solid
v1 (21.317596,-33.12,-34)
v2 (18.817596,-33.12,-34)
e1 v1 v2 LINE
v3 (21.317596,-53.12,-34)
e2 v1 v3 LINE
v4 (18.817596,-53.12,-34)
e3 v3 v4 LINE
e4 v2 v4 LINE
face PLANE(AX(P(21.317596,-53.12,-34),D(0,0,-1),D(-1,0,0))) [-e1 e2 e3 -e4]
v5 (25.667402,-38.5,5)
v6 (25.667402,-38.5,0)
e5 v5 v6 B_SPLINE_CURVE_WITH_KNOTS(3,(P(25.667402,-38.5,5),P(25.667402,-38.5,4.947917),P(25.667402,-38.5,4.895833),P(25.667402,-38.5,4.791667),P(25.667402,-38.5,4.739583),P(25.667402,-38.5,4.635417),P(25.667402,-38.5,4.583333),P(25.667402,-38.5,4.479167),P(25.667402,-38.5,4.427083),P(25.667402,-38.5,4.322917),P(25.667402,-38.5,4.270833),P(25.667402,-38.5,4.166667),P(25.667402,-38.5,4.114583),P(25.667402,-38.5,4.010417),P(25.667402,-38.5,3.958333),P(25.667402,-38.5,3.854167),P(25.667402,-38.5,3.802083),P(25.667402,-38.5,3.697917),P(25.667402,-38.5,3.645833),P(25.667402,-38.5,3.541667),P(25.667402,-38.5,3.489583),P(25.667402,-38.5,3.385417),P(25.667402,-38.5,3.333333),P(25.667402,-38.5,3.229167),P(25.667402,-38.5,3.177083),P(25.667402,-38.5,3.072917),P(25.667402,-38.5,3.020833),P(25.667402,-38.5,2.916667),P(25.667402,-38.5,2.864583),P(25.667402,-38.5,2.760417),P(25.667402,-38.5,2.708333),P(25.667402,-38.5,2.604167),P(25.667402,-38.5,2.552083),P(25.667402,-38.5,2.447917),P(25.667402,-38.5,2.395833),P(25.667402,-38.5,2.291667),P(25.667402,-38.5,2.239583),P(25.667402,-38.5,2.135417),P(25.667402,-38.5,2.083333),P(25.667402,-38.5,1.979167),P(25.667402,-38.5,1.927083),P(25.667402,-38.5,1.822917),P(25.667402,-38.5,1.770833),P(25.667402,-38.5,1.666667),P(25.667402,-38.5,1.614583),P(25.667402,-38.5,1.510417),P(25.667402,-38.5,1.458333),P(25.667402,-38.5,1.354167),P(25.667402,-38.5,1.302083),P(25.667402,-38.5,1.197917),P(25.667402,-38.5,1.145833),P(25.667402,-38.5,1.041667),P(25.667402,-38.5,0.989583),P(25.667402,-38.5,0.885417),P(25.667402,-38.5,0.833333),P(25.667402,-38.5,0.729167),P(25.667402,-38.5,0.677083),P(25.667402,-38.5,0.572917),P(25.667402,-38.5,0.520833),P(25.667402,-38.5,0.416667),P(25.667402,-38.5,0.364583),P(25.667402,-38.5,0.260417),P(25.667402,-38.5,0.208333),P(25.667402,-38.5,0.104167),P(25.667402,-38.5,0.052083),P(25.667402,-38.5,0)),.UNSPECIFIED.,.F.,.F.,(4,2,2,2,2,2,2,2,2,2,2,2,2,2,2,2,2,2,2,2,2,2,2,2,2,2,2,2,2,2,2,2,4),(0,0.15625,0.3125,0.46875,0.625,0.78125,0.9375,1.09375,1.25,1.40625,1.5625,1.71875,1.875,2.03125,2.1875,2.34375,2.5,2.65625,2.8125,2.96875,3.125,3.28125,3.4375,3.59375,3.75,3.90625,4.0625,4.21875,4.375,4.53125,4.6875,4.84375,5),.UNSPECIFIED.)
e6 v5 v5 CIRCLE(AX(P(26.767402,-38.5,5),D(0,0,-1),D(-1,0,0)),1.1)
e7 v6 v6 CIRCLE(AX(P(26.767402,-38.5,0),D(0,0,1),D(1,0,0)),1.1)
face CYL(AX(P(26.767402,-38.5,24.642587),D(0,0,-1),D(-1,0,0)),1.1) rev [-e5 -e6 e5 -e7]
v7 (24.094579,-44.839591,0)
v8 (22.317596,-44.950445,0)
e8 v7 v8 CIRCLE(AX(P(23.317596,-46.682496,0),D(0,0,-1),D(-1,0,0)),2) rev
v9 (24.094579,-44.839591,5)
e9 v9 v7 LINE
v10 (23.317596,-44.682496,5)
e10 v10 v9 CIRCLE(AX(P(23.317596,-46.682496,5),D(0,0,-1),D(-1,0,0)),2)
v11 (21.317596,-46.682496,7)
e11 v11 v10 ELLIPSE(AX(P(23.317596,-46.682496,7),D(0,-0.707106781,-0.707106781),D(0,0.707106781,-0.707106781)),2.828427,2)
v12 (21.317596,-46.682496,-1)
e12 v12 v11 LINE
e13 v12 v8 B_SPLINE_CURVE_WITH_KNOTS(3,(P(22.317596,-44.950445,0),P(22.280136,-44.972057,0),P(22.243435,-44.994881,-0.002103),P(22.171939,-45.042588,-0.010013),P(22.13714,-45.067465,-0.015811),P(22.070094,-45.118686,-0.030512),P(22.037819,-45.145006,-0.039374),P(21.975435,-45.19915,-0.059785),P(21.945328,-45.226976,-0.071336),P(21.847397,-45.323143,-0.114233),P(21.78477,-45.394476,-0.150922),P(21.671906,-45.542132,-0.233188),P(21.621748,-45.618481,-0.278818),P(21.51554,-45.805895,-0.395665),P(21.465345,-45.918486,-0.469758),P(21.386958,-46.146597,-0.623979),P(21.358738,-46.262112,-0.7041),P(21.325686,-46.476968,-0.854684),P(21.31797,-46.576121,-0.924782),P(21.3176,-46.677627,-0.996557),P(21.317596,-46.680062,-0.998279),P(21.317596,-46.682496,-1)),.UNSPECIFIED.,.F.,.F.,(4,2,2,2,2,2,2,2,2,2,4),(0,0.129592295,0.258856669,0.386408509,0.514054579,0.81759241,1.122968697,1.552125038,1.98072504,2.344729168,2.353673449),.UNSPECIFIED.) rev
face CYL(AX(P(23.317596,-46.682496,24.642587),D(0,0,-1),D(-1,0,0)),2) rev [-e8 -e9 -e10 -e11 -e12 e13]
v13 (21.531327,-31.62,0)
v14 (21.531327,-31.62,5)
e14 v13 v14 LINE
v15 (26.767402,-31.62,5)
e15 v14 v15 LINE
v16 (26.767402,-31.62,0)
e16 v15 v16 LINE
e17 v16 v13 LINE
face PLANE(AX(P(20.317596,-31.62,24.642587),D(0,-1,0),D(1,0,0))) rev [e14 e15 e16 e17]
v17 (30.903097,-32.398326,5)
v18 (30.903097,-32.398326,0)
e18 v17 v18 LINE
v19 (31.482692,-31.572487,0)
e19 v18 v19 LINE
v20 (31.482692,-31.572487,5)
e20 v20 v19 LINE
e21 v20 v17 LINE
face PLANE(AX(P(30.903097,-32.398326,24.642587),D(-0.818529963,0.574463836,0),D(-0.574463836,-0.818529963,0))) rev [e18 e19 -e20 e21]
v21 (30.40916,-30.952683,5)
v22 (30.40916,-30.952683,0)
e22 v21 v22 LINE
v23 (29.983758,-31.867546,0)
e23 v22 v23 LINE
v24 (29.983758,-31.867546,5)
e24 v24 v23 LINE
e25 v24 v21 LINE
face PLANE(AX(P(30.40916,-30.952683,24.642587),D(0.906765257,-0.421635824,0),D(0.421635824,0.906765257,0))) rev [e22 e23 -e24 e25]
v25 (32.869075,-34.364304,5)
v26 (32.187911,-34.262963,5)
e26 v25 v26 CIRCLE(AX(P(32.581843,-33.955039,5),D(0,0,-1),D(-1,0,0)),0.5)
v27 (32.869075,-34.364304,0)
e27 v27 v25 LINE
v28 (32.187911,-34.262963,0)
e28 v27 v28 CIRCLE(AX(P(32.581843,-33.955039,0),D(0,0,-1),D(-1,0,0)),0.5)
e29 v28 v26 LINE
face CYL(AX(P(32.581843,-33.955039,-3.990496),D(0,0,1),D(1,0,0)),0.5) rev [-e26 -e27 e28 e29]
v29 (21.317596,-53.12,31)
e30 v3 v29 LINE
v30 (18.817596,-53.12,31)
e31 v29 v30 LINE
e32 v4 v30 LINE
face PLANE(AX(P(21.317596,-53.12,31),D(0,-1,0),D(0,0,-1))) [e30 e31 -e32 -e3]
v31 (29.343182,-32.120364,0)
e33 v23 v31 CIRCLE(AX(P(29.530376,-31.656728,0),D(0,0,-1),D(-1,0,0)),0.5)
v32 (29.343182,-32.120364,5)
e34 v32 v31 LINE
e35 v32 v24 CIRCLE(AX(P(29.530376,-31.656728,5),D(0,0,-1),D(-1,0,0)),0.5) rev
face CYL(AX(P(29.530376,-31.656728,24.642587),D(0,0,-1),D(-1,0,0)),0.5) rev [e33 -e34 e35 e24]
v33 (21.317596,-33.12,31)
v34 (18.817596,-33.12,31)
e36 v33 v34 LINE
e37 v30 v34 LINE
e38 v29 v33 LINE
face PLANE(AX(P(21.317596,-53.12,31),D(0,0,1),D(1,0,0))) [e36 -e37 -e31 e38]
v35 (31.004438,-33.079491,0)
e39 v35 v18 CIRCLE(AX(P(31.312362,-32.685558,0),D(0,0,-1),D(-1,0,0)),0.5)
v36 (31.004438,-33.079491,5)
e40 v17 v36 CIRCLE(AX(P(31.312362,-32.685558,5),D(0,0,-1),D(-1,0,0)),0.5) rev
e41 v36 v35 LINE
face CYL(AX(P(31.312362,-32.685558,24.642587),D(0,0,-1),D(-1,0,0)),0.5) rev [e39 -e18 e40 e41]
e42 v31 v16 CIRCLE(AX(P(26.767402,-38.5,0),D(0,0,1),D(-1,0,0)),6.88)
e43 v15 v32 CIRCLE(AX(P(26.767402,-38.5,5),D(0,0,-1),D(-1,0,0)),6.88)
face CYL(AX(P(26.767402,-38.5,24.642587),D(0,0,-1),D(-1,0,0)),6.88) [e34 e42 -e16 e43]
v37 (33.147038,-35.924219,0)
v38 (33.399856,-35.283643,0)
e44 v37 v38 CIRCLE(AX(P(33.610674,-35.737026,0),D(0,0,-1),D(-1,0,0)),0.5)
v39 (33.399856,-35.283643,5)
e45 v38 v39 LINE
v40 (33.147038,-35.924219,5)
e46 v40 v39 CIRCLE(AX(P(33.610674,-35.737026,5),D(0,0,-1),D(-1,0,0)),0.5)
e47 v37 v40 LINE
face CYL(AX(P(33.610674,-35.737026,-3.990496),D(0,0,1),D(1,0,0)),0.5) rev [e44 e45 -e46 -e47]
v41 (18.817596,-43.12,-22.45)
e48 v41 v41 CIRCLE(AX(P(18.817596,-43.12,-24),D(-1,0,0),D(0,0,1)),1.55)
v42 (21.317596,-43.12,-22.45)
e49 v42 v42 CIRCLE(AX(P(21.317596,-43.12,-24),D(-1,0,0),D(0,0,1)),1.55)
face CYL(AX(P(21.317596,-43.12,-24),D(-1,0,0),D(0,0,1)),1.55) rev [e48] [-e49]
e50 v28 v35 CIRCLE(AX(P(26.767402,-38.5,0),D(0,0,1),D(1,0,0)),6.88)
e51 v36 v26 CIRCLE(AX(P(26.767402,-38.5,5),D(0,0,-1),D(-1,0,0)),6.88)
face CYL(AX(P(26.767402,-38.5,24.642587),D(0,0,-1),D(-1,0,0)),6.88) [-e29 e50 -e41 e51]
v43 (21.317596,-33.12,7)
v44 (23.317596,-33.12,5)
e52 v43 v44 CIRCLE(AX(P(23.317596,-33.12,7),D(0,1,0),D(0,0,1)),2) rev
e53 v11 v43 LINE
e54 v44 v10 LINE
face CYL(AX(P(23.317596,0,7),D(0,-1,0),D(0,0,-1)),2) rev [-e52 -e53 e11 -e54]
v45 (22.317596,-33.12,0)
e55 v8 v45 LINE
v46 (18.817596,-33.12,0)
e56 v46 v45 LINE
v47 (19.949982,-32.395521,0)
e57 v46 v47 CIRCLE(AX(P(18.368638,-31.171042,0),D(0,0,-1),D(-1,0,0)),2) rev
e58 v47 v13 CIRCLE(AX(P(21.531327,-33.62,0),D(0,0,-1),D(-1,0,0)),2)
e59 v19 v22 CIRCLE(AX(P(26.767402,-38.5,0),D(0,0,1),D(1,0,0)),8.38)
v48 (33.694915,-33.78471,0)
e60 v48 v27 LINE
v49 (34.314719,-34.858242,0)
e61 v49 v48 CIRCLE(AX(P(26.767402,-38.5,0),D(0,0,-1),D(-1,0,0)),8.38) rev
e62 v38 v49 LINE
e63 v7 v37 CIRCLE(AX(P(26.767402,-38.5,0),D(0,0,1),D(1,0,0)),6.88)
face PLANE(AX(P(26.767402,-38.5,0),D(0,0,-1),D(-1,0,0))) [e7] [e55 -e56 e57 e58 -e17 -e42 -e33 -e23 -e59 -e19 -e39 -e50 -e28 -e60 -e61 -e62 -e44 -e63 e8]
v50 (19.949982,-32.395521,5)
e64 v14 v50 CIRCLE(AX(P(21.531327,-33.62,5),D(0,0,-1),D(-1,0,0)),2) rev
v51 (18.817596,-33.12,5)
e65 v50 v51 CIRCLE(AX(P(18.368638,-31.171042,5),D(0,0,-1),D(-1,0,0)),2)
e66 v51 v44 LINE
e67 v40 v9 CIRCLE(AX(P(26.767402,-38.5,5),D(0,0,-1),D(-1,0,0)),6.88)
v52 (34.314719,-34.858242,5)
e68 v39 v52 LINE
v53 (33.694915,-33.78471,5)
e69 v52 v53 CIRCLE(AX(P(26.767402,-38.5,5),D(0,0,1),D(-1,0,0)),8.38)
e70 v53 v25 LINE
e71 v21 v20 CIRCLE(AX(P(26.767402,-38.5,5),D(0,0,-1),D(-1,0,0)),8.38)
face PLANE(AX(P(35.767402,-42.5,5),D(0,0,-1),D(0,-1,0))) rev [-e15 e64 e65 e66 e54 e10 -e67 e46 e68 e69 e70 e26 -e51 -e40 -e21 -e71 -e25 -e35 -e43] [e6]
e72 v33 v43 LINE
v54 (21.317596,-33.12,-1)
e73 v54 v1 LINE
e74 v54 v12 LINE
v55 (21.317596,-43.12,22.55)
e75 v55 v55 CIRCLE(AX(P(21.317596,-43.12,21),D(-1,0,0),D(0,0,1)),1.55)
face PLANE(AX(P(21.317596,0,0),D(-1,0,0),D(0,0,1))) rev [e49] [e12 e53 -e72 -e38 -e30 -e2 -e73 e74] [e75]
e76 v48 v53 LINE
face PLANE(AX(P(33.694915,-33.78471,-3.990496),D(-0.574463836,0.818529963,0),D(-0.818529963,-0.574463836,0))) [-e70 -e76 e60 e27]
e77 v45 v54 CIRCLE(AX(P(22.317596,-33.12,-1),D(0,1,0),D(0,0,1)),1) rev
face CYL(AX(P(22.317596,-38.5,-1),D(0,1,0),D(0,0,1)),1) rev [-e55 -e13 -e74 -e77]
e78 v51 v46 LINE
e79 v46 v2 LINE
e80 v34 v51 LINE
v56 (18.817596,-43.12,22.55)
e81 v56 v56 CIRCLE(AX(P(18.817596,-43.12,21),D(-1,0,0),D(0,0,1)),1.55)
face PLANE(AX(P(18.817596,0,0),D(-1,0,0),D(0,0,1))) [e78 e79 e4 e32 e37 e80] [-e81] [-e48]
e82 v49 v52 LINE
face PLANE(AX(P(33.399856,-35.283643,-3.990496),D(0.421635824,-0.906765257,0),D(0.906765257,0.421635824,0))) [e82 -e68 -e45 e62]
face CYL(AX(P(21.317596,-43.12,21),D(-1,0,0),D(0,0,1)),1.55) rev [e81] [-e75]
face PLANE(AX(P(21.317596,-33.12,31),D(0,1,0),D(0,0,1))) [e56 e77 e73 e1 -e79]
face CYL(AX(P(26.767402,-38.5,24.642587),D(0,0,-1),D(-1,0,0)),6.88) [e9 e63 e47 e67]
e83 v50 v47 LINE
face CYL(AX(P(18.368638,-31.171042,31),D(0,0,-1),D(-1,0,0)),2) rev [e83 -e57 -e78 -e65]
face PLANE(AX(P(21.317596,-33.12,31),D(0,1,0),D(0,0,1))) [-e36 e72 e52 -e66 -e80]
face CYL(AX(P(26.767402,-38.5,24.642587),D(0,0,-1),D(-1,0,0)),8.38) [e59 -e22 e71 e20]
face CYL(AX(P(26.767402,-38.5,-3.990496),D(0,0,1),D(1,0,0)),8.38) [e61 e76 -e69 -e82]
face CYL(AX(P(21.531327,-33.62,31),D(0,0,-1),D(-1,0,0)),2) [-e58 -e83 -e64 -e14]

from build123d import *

# Parameters (mm, degrees)
SKETCH2_R                = 1.1
BOSS_EXTRUDE1_DEPTH      = 5
BOSS_EXTRUDE2_DEPTH      = 1.5
BOSS_EXTRUDE2_DEPTH_BACK = 1
SKETCH4_W                = 65
SKETCH4_H                = 20
SKETCH4_R                = 1.55
FILLET1_R                = 2
FILLET2_R                = 2
FILLET3_DEPTH            = 5
FILLET3_START            = -46.68249578
FILLET3_2_DEPTH          = 13.56249578
FILLET3_START_2          = 5
FILLET3_3_DEPTH          = 3
FILLET4_START            = -44.68249568
FILLET4_DEPTH            = 11.56249568
FILLET4_START_2          = -46.68249588
FILLET4_2_DEPTH          = 2.0000002
FILLET4_START_3          = -2
FILLET4_3_DEPTH          = 2
BOSS_EXTRUDE3_START      = -5
BOSS_EXTRUDE3_DEPTH      = 5


with BuildPart() as part:
    # Sketch2 → Boss-Extrude1 (new body)
    with BuildSketch(Plane.XY):
        with BuildLine():
            Line((20.317595566, -31.62), (26.767401765, -31.62))
            ThreePointArc((26.767401765, -31.62), (28.079366857, -31.746249368), (29.343182309, -32.120364071))
            ThreePointArc((29.343182309, -32.120364071), (29.713933476, -32.121815396), (29.983758291, -31.867545651))
            Line((29.983758291, -31.867545651), (30.409159516, -30.952682564))
            ThreePointArc((30.409159516, -30.952682564), (30.957401765, -31.242707116), (31.482691519, -31.572486555))
            Line((31.482691519, -31.572486555), (30.903097457, -32.398326366))
            ThreePointArc((30.903097457, -32.398326366), (30.817805806, -32.759136383), (31.004438274, -33.07949065))
            ThreePointArc((31.004438274, -33.07949065), (33.576739296, -37.51647451), (32.365115584, -42.5))
            ThreePointArc((32.365115584, -42.5), (27.155948468, -45.369019687), (21.656472124, -43.105735361))
            Line((21.656472124, -43.105735361), (20.317595566, -41.62))
            Line((20.317595566, -41.62), (20.317595566, -31.62))
        make_face()
        with Locations(Location((26.767401765, -38.5, 0), (0, 0, 180))):
            Circle(SKETCH2_R, mode=Mode.SUBTRACT)
    extrude(amount=BOSS_EXTRUDE1_DEPTH)

    # Sketch4 → Boss-Extrude2 (add, two sides: drawn at the far end of the back side and taken through both)
    with BuildSketch(Plane.ZY.offset(-20.317595566).offset(-BOSS_EXTRUDE2_DEPTH_BACK)):
        with Locations((-1.5, -43.12)):
            Rectangle(SKETCH4_W, SKETCH4_H)
        with Locations((21, -43.12)):
            Circle(SKETCH4_R, mode=Mode.SUBTRACT)
        with Locations((-24, -43.12)):
            Circle(SKETCH4_R, mode=Mode.SUBTRACT)
    extrude(amount=BOSS_EXTRUDE2_DEPTH + BOSS_EXTRUDE2_DEPTH_BACK)

    # Fillet1
    # the kernel refuses this fillet: 2 mm, written as the material it adds along each edge
    with BuildSketch(Plane(origin=(20.317595566, -33.12, 5), x_dir=(0, 1, 0), z_dir=(0, 0, -1))) as fillet1_piece_1:
        with BuildLine():
            CenterArc((1.948957881, -1.948957881), FILLET1_R, 102.972239886, 64.055520228)
            Line((0, -1.5), (0, 0))
            Line((0, 0), (1.5, 0))
        make_face()
    extrude(amount=5)

    # Fillet2
    fillet2_edges = [part.edges().sort_by_distance(p)[0] for p in [
        (20.317595566, -31.62, 2.5),
    ]]
    fillet(fillet2_edges, radius=FILLET2_R)

    # Fillet3: read off the stored shape, not the designer's step
    # Fillet3 outline → Fillet3 (add)
    with BuildSketch(Plane.XY):
        with BuildLine():
            Line((21.317595566, -42.729688082), (21.317595566, -46.68249578))
            ThreePointArc((21.317595566, -46.68249578), (22.211694747, -45.01606745), (24.094578944, -44.839591325))
            ThreePointArc((24.094578944, -44.839591325), (22.780138954, -44.106793672), (21.656472124, -43.105735361))
            Line((21.656472124, -43.105735361), (21.317595566, -42.729688082))
        make_face()
    extrude(amount=FILLET3_DEPTH)

    # Fillet3 2 outline → Fillet3 2 (add)
    with BuildSketch(Plane(origin=(0, 0, 0), x_dir=(1, 0, 0), z_dir=(0, 1, 0)).offset(FILLET3_START)):
        with BuildLine():
            Line((21.317595566, -5), (21.317595566, -7))
            ThreePointArc((21.317595566, -7), (21.903382004, -5.585786438), (23.317595566, -5))
            Line((23.317595566, -5), (21.317595566, -5))
        make_face()
    extrude(amount=FILLET3_2_DEPTH)

    # Fillet3 3 outline → Fillet3 3 (cut)
    with BuildSketch(Plane.XY.offset(FILLET3_START_2)):
        with BuildLine():
            ThreePointArc((24.094578944, -44.839591325), (22.211694747, -45.01606745), (21.317595566, -46.68249578))
            Line((21.317595566, -46.68249578), (25, -46.68249578))
            Line((25, -46.68249578), (25, -45.221324143))
            Line((25, -45.221324143), (24.094578944, -44.839591325))
        make_face()
    extrude(amount=FILLET3_3_DEPTH, mode=Mode.SUBTRACT)

    # Fillet4: read off the stored shape, not the designer's step
    # Fillet4 outline → Fillet4 (add)
    with BuildSketch(Plane(origin=(0, 0, 0), x_dir=(1, 0, 0), z_dir=(0, 1, 0)).offset(FILLET4_START)):
        with BuildLine():
            ThreePointArc((22.317595566, 0), (21.610488785, 0.292893219), (21.317595566, 1))
            Line((21.317595566, 1), (21.317595566, 0))
            Line((21.317595566, 0), (22.317595566, 0))
        make_face()
    extrude(amount=FILLET4_DEPTH)

    # Fillet4 2 outline → Fillet4 2 (add)
    with BuildSketch(Plane(origin=(0, 0, 0), x_dir=(1, 0, 0), z_dir=(0, 1, 0)).offset(FILLET4_START_2)):
        with BuildLine():
            ThreePointArc((22.317595566, 0), (21.610488785, 0.292893219), (21.317595566, 1))
            Line((21.317595566, 1), (21.317595566, 0))
            Line((21.317595566, 0), (22.317595566, 0))
        make_face()
    extrude(amount=FILLET4_2_DEPTH)

    # Fillet4 3 outline → Fillet4 3 (cut)
    with BuildSketch(Plane.XY.offset(FILLET4_START_3)):
        with BuildLine():
            ThreePointArc((24, -44.802515943), (22.169729909, -45.044691019), (21.317595566, -46.68249578))
            Line((21.317595566, -46.68249578), (24, -46.68249588))
            Line((24, -46.68249588), (24, -44.802515943))
        make_face()
    extrude(amount=FILLET4_3_DEPTH, mode=Mode.SUBTRACT)

    # Sketch5 → Boss-Extrude3 (add)
    with BuildSketch(Plane(origin=(0, 0, 5), x_dir=(-1, 0, 0), z_dir=(0, 0, 1)).offset(BOSS_EXTRUDE3_START)):
        with BuildLine():
            Line((-33.69491521, 33.784710246), (-32.869075399, 34.364304307))
            ThreePointArc((-32.869075399, 34.364304307), (-32.508265382, 34.449595959), (-32.187911115, 34.262963491))
            Line((-32.187911115, 34.262963491), (-31.321885711, 34.762963491))
            Line((-31.321885711, 34.762963491), (-32.28101229, 36.424219456))
            Line((-32.28101229, 36.424219456), (-33.147037694, 35.924219456))
            ThreePointArc((-33.147037694, 35.924219456), (-33.145586368, 35.553468289), (-33.399856114, 35.283643474))
            Line((-33.399856114, 35.283643474), (-34.314719201, 34.858242249))
            ThreePointArc((-34.314719201, 34.858242249), (-34.024694648, 34.31), (-33.69491521, 33.784710246))
        make_face()
    extrude(amount=BOSS_EXTRUDE3_DEPTH)


solid = part.part
